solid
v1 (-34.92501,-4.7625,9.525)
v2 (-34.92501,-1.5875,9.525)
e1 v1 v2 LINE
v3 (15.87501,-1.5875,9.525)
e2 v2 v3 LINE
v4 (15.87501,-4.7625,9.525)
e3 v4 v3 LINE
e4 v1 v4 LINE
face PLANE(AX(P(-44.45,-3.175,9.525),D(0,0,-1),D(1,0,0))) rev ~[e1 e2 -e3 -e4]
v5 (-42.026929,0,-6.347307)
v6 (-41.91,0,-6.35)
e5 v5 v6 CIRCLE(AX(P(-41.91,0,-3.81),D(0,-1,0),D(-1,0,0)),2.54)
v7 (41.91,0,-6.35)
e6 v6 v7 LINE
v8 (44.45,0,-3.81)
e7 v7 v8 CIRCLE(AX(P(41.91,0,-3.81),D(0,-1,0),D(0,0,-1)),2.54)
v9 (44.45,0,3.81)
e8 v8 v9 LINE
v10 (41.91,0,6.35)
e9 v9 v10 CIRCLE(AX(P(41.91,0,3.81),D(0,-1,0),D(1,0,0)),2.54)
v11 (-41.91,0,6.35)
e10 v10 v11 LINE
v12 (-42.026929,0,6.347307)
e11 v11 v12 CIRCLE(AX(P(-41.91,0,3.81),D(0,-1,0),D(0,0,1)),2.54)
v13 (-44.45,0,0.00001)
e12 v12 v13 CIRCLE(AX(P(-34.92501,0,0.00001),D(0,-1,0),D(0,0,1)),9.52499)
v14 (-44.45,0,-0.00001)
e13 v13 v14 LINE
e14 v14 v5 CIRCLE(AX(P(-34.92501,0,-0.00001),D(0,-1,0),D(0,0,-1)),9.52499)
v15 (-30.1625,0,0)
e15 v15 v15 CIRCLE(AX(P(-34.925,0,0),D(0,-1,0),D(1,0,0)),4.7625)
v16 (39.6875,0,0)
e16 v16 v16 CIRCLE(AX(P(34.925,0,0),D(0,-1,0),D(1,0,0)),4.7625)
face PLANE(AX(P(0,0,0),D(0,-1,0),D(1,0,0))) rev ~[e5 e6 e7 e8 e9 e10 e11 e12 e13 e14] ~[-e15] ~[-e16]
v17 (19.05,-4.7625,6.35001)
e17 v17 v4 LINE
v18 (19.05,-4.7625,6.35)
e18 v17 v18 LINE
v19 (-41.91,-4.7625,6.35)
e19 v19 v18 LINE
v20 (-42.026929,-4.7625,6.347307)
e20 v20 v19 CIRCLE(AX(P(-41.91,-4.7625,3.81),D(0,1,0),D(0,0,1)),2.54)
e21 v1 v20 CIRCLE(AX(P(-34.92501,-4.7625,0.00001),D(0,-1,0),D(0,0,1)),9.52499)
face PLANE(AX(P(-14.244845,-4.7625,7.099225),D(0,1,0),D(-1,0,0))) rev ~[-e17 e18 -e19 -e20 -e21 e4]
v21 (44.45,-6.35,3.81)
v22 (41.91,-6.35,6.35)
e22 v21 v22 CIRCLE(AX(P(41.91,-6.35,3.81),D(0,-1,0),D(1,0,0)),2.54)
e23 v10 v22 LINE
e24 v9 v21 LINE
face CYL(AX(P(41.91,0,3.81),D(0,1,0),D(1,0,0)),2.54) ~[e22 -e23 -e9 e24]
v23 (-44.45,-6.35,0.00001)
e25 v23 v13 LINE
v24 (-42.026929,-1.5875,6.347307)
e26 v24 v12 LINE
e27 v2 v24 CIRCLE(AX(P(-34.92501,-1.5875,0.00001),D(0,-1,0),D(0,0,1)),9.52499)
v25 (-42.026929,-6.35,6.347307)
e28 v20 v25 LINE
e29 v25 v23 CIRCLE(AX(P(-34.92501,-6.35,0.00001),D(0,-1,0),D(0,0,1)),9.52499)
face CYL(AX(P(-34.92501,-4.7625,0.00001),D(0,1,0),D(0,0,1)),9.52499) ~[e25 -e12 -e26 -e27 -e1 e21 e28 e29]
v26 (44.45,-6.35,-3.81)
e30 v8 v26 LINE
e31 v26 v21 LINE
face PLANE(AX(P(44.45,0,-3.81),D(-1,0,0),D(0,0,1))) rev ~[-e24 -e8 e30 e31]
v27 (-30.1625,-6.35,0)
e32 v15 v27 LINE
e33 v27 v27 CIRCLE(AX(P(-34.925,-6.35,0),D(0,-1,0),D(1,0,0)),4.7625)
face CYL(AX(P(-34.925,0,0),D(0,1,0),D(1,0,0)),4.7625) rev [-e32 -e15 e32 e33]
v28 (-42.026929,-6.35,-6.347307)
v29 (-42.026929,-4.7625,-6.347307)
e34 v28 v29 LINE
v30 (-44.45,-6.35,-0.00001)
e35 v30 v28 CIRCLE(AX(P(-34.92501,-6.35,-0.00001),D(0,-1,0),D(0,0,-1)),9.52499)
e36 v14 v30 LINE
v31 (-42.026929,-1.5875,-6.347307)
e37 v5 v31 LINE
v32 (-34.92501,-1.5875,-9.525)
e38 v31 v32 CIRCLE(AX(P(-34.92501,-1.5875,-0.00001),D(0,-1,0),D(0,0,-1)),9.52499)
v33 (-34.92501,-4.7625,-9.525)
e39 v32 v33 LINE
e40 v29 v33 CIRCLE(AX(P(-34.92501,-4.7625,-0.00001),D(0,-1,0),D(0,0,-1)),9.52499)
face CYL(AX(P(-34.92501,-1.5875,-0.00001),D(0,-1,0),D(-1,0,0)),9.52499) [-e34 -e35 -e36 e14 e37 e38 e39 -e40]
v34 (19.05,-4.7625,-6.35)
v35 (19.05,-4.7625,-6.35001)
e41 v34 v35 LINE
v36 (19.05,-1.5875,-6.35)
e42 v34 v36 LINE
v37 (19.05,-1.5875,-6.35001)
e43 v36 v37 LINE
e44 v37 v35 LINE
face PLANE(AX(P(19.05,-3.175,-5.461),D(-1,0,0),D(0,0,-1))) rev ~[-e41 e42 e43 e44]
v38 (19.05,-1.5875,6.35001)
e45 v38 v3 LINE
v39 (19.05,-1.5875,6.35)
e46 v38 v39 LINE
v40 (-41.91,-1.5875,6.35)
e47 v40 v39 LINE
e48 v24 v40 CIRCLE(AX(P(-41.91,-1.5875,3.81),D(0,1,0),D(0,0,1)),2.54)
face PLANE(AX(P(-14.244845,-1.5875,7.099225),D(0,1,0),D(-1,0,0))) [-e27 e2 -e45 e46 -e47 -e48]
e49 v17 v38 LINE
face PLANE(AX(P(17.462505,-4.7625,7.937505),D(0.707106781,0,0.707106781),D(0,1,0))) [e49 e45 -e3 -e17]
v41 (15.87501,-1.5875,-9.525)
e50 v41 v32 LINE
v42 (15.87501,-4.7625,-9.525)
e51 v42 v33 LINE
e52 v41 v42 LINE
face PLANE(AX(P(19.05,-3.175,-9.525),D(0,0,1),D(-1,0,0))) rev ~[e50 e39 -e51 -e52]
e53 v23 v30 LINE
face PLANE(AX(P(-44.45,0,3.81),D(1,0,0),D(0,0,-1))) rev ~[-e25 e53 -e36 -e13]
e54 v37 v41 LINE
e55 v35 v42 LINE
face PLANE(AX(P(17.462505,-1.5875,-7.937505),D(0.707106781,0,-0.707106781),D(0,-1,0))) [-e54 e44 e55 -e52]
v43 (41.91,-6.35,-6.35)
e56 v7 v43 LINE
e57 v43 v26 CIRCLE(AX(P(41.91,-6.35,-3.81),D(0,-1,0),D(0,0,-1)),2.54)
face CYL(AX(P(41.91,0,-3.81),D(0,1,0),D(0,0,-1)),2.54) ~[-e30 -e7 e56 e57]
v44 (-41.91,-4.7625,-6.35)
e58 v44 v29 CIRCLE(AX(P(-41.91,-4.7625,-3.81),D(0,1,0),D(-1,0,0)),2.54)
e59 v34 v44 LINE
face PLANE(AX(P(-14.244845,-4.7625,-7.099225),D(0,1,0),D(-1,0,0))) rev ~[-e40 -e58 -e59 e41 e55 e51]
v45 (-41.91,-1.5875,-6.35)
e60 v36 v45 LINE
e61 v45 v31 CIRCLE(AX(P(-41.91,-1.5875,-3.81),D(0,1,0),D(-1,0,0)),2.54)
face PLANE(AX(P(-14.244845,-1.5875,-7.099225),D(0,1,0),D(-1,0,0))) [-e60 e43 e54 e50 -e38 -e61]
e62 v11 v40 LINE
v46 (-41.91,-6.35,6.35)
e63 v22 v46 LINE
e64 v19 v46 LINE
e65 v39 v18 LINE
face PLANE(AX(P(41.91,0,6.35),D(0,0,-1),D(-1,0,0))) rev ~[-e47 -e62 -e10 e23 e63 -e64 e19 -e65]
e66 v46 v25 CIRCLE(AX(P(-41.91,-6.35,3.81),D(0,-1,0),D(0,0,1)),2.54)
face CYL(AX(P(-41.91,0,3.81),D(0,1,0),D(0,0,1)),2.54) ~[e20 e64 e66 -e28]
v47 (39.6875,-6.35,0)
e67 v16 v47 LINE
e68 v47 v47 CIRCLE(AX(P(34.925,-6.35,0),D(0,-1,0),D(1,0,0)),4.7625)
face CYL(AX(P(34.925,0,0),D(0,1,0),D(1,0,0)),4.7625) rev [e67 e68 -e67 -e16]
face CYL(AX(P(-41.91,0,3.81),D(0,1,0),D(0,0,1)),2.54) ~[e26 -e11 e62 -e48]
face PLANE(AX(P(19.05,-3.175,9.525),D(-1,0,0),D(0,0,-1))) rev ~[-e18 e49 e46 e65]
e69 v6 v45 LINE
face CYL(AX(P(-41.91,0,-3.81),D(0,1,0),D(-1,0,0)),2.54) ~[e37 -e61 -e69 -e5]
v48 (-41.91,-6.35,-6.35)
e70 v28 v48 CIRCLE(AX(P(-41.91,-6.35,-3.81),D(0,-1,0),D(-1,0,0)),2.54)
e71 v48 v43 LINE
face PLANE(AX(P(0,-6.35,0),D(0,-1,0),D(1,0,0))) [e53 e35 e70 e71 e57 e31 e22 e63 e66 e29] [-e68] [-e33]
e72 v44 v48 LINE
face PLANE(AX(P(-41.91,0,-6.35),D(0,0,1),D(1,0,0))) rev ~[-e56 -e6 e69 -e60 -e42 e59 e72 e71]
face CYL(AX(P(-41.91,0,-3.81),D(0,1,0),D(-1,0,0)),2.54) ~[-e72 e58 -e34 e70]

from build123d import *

# Parameters (mm, degrees)
F0_R          = 4.7625
F1_DEPTH      = 6.35
F5_DEPTH      = 1.5875
F5_DEPTH_BACK = 1.5875
F6_SIZE       = 3.17499
F7_R          = 9.52499


# Not quite as in the source:
# - a fillet or chamfer is up to 0.001 mm smaller than in the source, because OpenCascade refuses the exact size


with BuildPart() as f1:
    # F0 (on Front) → F1 (new body)
    with BuildSketch(Plane.XZ):
        with BuildLine():
            ThreePointArc((44.45, 3.81), (43.7060512242, 5.6060512242), (41.91, 6.35))
            Line((41.91, 6.35), (-41.91, 6.35))
            ThreePointArc((-41.91, 6.35), (-43.7060512242, 5.6060512242), (-44.45, 3.81))
            Line((-44.45, 3.81), (-44.45, -3.81))
            ThreePointArc((-44.45, -3.81), (-43.7060512242, -5.6060512242), (-41.91, -6.35))
            Line((-41.91, -6.35), (41.91, -6.35))
            ThreePointArc((41.91, -6.35), (43.7060512242, -5.6060512242), (44.45, -3.81))
            Line((44.45, -3.81), (44.45, 3.81))
        make_face()
        with Locations((-34.925, 0)):
            Circle(F0_R, mode=Mode.SUBTRACT)
        with Locations((34.925, 0)):
            Circle(F0_R, mode=Mode.SUBTRACT)
    extrude(amount=F1_DEPTH)

    # F4 (on face) → F5 (join, two sides)
    with BuildSketch(Plane(origin=(0, -3.175, 0), x_dir=(-1, 0, 0), z_dir=(0, 1, 0))) as f5_sk:
        Polygon((36.3781489432, 5.461), (44.45, 0), (44.45, 9.525), (-19.05, 9.525), (-19.05, 5.461), (29.7344345599, 5.461), align=None)
        Polygon((-19.05, -5.461), (-19.05, -9.525), (44.45, -9.525), (44.45, 0), (36.3781489432, -5.461), (29.7344345599, -5.461), align=None)
    extrude(amount=F5_DEPTH)
    extrude(f5_sk.sketch, amount=-F5_DEPTH_BACK)

    # F6 (size 3.175 in the source; OpenCascade refuses exactly that, so slightly less here)
    f6_edges = [f1.edges().sort_by_distance(p)[0] for p in [
        (19.05, -3.175, 9.525),
        (19.05, -3.175, -9.525),
    ]]
    chamfer(f6_edges, length=F6_SIZE)

    # F7 (radius 9.525 in the source; OpenCascade refuses exactly that, so slightly less here)
    f7_edges = [f1.edges().sort_by_distance(p)[0] for p in [
        (-44.45, -3.175, 9.525),
        (-44.45, -3.175, -9.525),
    ]]
    fillet(f7_edges, radius=F7_R)


solid = f1.part
